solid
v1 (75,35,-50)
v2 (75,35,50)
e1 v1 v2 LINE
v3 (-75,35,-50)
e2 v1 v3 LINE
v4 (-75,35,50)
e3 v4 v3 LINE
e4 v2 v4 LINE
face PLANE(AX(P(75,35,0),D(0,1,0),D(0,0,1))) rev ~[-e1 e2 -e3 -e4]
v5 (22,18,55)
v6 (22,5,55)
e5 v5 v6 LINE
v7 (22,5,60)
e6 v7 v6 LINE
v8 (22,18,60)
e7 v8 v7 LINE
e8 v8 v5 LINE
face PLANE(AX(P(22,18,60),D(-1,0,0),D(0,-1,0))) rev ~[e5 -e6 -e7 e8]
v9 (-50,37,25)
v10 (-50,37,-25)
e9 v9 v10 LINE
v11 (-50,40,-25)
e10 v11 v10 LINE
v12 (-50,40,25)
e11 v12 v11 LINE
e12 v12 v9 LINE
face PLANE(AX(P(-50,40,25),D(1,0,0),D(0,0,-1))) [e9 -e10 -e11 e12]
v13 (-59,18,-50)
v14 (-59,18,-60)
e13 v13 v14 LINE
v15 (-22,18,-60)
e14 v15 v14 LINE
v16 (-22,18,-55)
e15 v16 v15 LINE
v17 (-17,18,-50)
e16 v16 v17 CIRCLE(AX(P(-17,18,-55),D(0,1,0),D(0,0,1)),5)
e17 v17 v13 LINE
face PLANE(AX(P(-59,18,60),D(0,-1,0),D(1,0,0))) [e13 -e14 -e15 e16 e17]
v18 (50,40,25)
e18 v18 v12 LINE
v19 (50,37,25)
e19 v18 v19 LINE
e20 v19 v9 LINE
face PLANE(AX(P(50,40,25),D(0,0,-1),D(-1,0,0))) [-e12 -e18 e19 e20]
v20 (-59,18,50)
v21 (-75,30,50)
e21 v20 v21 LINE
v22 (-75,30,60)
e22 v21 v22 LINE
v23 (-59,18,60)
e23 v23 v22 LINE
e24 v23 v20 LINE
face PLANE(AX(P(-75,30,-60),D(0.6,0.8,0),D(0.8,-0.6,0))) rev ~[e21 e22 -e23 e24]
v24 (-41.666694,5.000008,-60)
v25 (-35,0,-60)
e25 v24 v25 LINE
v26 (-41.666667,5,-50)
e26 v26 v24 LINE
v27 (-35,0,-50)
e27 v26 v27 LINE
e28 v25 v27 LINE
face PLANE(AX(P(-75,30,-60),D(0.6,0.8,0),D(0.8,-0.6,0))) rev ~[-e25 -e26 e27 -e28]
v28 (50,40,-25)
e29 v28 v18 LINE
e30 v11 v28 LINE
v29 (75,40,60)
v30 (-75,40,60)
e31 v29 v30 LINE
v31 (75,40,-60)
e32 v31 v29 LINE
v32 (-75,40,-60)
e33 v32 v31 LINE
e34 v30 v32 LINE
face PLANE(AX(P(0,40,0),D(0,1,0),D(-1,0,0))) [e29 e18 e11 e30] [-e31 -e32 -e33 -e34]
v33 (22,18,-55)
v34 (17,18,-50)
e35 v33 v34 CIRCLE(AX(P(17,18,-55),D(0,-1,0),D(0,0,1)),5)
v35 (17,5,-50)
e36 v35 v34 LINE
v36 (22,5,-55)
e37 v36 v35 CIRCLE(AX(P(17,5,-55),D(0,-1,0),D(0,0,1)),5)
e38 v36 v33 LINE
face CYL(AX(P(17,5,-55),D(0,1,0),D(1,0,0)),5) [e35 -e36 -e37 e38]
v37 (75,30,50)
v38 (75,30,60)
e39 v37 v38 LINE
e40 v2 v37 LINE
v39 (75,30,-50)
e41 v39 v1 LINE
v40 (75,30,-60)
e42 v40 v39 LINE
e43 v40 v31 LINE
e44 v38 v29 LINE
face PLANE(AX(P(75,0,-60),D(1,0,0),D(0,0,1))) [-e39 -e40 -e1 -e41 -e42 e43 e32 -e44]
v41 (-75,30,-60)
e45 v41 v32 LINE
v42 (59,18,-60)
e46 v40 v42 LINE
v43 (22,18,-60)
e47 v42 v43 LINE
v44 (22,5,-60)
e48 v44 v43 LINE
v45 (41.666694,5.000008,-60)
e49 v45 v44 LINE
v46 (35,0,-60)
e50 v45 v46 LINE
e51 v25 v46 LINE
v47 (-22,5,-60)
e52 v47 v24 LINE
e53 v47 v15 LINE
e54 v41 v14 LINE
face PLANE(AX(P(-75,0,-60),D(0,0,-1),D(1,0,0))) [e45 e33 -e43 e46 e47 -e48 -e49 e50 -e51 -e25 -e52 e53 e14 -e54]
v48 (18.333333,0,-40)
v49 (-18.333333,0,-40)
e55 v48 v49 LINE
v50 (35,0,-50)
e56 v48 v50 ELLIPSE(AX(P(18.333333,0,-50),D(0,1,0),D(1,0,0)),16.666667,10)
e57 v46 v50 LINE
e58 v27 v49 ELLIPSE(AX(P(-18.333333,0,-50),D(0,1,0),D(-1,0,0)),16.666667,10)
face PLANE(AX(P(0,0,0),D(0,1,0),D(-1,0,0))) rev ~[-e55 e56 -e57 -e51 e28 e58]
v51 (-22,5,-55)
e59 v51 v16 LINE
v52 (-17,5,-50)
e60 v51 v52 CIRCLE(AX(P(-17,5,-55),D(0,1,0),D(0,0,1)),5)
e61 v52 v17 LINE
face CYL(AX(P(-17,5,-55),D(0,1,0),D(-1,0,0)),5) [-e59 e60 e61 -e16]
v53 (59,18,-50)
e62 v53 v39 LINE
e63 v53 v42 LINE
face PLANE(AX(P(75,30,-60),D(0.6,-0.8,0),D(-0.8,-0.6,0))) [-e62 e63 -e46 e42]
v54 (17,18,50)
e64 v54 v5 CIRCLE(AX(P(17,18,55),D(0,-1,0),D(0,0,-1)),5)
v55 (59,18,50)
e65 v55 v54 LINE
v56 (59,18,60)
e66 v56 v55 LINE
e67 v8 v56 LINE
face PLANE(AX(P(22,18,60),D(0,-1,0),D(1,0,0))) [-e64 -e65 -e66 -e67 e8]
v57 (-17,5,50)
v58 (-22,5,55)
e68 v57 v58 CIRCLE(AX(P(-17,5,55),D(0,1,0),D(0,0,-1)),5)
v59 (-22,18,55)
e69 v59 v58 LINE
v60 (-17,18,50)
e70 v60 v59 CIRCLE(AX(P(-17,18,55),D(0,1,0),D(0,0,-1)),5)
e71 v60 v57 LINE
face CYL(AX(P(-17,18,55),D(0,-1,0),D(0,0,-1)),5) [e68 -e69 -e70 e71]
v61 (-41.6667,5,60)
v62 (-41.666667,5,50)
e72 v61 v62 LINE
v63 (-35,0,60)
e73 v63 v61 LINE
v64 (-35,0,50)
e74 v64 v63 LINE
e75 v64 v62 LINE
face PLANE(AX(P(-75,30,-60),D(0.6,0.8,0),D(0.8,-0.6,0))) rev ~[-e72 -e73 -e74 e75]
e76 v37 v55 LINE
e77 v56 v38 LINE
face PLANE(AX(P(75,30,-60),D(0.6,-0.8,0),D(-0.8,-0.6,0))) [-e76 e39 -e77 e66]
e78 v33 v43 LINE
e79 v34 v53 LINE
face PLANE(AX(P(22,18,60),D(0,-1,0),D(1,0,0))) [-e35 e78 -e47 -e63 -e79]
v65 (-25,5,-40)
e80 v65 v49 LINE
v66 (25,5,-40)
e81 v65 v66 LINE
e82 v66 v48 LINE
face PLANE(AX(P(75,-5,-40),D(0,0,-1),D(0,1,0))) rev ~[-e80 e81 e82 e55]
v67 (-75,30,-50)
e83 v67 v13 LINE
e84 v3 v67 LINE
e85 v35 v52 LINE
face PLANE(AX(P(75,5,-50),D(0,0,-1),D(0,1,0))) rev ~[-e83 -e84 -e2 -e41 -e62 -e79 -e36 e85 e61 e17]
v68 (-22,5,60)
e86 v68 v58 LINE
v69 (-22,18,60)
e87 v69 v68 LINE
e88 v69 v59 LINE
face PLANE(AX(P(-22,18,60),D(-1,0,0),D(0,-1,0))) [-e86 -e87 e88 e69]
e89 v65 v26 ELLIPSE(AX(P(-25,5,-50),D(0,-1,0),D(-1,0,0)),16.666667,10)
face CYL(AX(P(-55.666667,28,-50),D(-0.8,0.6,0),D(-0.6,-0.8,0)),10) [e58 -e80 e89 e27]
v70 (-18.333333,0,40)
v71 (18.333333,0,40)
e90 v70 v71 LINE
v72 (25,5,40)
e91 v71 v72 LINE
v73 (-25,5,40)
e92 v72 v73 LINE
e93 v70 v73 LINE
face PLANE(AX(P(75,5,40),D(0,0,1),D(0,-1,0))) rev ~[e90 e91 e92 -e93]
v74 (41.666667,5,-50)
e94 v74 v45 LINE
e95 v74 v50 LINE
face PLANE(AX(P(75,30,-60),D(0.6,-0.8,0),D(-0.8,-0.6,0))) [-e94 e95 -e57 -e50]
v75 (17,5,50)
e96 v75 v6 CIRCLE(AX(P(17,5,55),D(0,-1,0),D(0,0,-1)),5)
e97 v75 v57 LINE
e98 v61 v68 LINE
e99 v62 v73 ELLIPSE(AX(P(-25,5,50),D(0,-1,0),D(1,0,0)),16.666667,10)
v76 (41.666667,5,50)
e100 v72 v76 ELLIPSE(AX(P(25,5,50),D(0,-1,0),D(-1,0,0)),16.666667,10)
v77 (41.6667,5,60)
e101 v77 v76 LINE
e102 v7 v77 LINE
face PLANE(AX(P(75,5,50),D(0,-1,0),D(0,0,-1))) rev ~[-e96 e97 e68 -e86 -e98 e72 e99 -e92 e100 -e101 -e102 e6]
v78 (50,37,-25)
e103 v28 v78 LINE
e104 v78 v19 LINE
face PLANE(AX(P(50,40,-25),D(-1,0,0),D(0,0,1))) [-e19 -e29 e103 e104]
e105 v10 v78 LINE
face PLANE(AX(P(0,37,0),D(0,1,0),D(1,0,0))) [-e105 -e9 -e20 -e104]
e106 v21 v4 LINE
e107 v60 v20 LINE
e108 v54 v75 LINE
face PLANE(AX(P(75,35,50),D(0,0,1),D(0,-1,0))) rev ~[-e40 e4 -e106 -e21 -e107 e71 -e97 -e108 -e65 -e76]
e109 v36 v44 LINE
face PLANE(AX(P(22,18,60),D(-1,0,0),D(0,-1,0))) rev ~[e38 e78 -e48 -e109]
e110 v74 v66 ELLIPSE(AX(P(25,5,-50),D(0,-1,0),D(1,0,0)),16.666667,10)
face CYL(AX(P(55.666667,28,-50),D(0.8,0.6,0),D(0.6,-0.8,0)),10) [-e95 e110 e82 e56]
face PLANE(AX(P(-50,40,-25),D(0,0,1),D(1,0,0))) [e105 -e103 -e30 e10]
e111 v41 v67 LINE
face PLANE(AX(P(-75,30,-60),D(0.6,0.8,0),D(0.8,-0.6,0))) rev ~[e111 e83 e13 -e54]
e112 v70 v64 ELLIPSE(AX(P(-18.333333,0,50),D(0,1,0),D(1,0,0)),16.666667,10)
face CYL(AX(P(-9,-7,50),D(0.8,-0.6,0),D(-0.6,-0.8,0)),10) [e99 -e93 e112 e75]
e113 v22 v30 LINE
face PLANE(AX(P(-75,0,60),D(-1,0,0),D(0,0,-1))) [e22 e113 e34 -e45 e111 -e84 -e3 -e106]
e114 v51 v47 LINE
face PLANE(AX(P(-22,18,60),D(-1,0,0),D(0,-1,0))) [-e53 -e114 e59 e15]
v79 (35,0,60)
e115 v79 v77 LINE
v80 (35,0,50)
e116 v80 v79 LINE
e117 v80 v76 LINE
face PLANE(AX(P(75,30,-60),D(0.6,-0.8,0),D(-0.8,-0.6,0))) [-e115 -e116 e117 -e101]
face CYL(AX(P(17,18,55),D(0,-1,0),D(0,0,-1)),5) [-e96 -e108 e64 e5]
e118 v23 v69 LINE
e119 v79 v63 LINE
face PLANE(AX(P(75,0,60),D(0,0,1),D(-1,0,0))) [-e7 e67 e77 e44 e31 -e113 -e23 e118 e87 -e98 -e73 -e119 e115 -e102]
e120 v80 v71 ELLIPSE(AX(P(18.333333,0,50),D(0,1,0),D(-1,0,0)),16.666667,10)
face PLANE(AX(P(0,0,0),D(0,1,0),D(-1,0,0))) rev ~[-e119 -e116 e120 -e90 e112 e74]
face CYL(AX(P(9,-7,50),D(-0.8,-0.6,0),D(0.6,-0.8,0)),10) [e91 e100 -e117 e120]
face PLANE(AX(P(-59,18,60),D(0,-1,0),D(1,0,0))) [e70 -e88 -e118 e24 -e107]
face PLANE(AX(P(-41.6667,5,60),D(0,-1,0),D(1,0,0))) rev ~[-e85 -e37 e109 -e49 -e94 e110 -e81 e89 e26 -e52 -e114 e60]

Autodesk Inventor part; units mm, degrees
ref_plane "YZ Plane" through (0, 0, 0) normal (1, 0, 0) x (0, 1, 0)
ref_plane "XZ Plane" through (0, 0, 0) normal (0, 1, 0) x (-1, 0, 0)
ref_plane "XY Plane" through (0, 0, 0) normal (0, 0, 1) x (1, 0, 0)
sketch "Sketch1" plane through (0, 0, 0) normal (0, 1, 0) x (-1, 0, 0)
  line L0 (75, -60) -> (-75, -60)
  line L1 (-75, -60) -> (-75, 60)
  line L2 (-75, 60) -> (75, 60)
  line L3 (75, 60) -> (75, -60)
  line L4 (75, -60) -> (-75, 60) construction
  line L5 (-75, -60) -> (75, 60) construction
  point P0 (0, 0)
  dimension "d0" = 120
  dimension "d1" = 150
extrude "Extrusion1" add sketch "Sketch1" along normal blind 40
sketch "Sketch2" plane through (75, 0, 60) normal (1, 0, 0) x (0, 0, -1)
  line L0 (60, 0) -> (60, 40)
  line L1 (110, 35) -> (10, 35)
  line L2 (10, 35) -> (10, 5)
  line L3 (10, 5) -> (110, 5)
  line L4 (110, 5) -> (110, 35)
  line L5 (110, 35) -> (10, 5) construction
  line L6 (10, 35) -> (110, 5) construction
  line L7 (0, 40) -> (120, 40) projected
  point P0 (60, 20)
  dimension "d4" = 100
  dimension "d5" = 30
  dimension "d6" = 5
extrude "Extrusion2" cut sketch "Sketch2" against normal through all
sketch "Sketch3" plane through (75, 0, 60) normal (1, 0, 0) x (0, 0, -1)
  line L0 (60, 0) -> (60, 5)
  line L1 (110, 5) -> (10, 5) projected
  line L2 (100, 10) -> (20, 10)
  line L3 (20, 10) -> (20, -5)
  line L4 (20, -5) -> (100, -5)
  line L5 (100, -5) -> (100, 10)
  line L6 (100, 10) -> (20, -5) construction
  line L7 (20, 10) -> (100, -5) construction
  point P0 (60, 2.5)
  point P1 (100, 5)
  point P2 (20, 5)
  point P3 (110, 5)
  point P4 (0, 5)
  point P5 (100, 15)
  dimension "d9" = 80
extrude "Extrusion3" cut sketch "Sketch3" against normal through all
sketch "Sketch4" plane through (0, 40, 0) normal (0, 1, 0) x (1, 0, 0)
  line L0 (-50, 25) -> (50, 25)
  line L1 (50, 25) -> (50, -25)
  line L2 (50, -25) -> (-50, -25)
  line L3 (-50, -25) -> (-50, 25)
  line L4 (-50, 25) -> (50, -25) construction
  line L5 (50, 25) -> (-50, -25) construction
  point P0 (0, 0)
  dimension "d12" = 50
  dimension "d13" = 100
extrude "Extrusion4" cut sketch "Sketch4" against normal blind 3
sketch "Sketch5" plane through (75, 0, -60) normal (0, 0, -1) x (-1, 0, 0)
  line L0 (0, 0) -> (150, 0) projected
  line L1 (150, 0) -> (150, 40) projected
  line L2 (0, 40) -> (150, 40) projected
  line L3 (0, 0) -> (0, 40) projected
  line L4 (150, 0) -> (0, 0) construction
  line L5 (150, 0) -> (0, 40) construction
  line L6 (0, 0) -> (0, 40) construction
  line L7 (0, 0) -> (150, 40) construction
  line L8 (75, 20) -> (75, 40) construction
  line L9 (0, 40) -> (40, 40)
  line L10 (40, 0) -> (0, 0)
  line L11 (0, 0) -> (0, 40)
  line L12 (150, 0) -> (150, 40)
  line L13 (0, 30) -> (40, 30)
  line L14 (40, 30) -> (40, 0)
  line L15 (40, 0) -> (0, 0)
  line L16 (0, 0) -> (0, 30)
  line L17 (0, 30) -> (40, 0)
  line L18 (150, 30) -> (110, 30)
  line L19 (110, 30) -> (110, 0)
  line L20 (150, 30) -> (110, 0)
  point P0 (75, 0)
  point P1 (150, 30)
  point P2 (110, 0)
  point P3 (110, 0)
  dimension "d20" = 30
  dimension "d21" = 70
extrude "Extrusion5" cut sketch "Sketch5" against normal through all contours L3 L17 L0 | L20 L1 L0
sketch "Sketch6" plane through (-75, 40, 60) normal (0, 0, 1) x (1, 0, 0)
  line L0 (0, 0) -> (150, 0) projected
  line L1 (150, -10) -> (150, 0) projected
  line L2 (0, 0) -> (150, 0) projected
  line L3 (0, -10) -> (0, 0) projected
  line L4 (0, -10) -> (40, -40) projected
  line L5 (33.3333, -35) -> (116.6667, -35)
  line L6 (40, -40) -> (0, -10) projected
  line L7 (16, -22) -> (134, -22)
  line L8 (150, -10) -> (110, -40) projected
  line L9 (53, -22) -> (53, -35)
  line L10 (150, -35) -> (33.3333, -35) projected
  line L11 (75, -40) -> (75, 0)
  line L12 (25, 0) -> (125, 0) construction
  line L13 (97, -22) -> (97, -35)
  line L14 (0, -10) -> (40, -40) projected
  line L15 (40, -40) -> (110, -40) projected
  line L16 (110, -40) -> (150, -10) projected
  point P0 (97, -22)
  point P1 (97, -35)
  point P2 (16, -22)
  dimension "d22" = 13
  dimension "d24" = 22
extrude "Extrusion6" cut sketch "Sketch6" against normal through all contours L7 L9 L5 L4 | L7 L8 L5 L13
fillet "Fillet1" radius 5 4 edges at (22, 11.5, 50) (-22, 11.5, 50) (-22, 11.5, -50) (22, 11.5, -50)
fillet "Fillet2" radius 10 4 edges at (38.3333, 2.5, 40) (-38.3333, 2.5, 40) (-38.3333, 2.5, -40) (38.3333, 2.5, -40)
properties part number "Battery Cage"
